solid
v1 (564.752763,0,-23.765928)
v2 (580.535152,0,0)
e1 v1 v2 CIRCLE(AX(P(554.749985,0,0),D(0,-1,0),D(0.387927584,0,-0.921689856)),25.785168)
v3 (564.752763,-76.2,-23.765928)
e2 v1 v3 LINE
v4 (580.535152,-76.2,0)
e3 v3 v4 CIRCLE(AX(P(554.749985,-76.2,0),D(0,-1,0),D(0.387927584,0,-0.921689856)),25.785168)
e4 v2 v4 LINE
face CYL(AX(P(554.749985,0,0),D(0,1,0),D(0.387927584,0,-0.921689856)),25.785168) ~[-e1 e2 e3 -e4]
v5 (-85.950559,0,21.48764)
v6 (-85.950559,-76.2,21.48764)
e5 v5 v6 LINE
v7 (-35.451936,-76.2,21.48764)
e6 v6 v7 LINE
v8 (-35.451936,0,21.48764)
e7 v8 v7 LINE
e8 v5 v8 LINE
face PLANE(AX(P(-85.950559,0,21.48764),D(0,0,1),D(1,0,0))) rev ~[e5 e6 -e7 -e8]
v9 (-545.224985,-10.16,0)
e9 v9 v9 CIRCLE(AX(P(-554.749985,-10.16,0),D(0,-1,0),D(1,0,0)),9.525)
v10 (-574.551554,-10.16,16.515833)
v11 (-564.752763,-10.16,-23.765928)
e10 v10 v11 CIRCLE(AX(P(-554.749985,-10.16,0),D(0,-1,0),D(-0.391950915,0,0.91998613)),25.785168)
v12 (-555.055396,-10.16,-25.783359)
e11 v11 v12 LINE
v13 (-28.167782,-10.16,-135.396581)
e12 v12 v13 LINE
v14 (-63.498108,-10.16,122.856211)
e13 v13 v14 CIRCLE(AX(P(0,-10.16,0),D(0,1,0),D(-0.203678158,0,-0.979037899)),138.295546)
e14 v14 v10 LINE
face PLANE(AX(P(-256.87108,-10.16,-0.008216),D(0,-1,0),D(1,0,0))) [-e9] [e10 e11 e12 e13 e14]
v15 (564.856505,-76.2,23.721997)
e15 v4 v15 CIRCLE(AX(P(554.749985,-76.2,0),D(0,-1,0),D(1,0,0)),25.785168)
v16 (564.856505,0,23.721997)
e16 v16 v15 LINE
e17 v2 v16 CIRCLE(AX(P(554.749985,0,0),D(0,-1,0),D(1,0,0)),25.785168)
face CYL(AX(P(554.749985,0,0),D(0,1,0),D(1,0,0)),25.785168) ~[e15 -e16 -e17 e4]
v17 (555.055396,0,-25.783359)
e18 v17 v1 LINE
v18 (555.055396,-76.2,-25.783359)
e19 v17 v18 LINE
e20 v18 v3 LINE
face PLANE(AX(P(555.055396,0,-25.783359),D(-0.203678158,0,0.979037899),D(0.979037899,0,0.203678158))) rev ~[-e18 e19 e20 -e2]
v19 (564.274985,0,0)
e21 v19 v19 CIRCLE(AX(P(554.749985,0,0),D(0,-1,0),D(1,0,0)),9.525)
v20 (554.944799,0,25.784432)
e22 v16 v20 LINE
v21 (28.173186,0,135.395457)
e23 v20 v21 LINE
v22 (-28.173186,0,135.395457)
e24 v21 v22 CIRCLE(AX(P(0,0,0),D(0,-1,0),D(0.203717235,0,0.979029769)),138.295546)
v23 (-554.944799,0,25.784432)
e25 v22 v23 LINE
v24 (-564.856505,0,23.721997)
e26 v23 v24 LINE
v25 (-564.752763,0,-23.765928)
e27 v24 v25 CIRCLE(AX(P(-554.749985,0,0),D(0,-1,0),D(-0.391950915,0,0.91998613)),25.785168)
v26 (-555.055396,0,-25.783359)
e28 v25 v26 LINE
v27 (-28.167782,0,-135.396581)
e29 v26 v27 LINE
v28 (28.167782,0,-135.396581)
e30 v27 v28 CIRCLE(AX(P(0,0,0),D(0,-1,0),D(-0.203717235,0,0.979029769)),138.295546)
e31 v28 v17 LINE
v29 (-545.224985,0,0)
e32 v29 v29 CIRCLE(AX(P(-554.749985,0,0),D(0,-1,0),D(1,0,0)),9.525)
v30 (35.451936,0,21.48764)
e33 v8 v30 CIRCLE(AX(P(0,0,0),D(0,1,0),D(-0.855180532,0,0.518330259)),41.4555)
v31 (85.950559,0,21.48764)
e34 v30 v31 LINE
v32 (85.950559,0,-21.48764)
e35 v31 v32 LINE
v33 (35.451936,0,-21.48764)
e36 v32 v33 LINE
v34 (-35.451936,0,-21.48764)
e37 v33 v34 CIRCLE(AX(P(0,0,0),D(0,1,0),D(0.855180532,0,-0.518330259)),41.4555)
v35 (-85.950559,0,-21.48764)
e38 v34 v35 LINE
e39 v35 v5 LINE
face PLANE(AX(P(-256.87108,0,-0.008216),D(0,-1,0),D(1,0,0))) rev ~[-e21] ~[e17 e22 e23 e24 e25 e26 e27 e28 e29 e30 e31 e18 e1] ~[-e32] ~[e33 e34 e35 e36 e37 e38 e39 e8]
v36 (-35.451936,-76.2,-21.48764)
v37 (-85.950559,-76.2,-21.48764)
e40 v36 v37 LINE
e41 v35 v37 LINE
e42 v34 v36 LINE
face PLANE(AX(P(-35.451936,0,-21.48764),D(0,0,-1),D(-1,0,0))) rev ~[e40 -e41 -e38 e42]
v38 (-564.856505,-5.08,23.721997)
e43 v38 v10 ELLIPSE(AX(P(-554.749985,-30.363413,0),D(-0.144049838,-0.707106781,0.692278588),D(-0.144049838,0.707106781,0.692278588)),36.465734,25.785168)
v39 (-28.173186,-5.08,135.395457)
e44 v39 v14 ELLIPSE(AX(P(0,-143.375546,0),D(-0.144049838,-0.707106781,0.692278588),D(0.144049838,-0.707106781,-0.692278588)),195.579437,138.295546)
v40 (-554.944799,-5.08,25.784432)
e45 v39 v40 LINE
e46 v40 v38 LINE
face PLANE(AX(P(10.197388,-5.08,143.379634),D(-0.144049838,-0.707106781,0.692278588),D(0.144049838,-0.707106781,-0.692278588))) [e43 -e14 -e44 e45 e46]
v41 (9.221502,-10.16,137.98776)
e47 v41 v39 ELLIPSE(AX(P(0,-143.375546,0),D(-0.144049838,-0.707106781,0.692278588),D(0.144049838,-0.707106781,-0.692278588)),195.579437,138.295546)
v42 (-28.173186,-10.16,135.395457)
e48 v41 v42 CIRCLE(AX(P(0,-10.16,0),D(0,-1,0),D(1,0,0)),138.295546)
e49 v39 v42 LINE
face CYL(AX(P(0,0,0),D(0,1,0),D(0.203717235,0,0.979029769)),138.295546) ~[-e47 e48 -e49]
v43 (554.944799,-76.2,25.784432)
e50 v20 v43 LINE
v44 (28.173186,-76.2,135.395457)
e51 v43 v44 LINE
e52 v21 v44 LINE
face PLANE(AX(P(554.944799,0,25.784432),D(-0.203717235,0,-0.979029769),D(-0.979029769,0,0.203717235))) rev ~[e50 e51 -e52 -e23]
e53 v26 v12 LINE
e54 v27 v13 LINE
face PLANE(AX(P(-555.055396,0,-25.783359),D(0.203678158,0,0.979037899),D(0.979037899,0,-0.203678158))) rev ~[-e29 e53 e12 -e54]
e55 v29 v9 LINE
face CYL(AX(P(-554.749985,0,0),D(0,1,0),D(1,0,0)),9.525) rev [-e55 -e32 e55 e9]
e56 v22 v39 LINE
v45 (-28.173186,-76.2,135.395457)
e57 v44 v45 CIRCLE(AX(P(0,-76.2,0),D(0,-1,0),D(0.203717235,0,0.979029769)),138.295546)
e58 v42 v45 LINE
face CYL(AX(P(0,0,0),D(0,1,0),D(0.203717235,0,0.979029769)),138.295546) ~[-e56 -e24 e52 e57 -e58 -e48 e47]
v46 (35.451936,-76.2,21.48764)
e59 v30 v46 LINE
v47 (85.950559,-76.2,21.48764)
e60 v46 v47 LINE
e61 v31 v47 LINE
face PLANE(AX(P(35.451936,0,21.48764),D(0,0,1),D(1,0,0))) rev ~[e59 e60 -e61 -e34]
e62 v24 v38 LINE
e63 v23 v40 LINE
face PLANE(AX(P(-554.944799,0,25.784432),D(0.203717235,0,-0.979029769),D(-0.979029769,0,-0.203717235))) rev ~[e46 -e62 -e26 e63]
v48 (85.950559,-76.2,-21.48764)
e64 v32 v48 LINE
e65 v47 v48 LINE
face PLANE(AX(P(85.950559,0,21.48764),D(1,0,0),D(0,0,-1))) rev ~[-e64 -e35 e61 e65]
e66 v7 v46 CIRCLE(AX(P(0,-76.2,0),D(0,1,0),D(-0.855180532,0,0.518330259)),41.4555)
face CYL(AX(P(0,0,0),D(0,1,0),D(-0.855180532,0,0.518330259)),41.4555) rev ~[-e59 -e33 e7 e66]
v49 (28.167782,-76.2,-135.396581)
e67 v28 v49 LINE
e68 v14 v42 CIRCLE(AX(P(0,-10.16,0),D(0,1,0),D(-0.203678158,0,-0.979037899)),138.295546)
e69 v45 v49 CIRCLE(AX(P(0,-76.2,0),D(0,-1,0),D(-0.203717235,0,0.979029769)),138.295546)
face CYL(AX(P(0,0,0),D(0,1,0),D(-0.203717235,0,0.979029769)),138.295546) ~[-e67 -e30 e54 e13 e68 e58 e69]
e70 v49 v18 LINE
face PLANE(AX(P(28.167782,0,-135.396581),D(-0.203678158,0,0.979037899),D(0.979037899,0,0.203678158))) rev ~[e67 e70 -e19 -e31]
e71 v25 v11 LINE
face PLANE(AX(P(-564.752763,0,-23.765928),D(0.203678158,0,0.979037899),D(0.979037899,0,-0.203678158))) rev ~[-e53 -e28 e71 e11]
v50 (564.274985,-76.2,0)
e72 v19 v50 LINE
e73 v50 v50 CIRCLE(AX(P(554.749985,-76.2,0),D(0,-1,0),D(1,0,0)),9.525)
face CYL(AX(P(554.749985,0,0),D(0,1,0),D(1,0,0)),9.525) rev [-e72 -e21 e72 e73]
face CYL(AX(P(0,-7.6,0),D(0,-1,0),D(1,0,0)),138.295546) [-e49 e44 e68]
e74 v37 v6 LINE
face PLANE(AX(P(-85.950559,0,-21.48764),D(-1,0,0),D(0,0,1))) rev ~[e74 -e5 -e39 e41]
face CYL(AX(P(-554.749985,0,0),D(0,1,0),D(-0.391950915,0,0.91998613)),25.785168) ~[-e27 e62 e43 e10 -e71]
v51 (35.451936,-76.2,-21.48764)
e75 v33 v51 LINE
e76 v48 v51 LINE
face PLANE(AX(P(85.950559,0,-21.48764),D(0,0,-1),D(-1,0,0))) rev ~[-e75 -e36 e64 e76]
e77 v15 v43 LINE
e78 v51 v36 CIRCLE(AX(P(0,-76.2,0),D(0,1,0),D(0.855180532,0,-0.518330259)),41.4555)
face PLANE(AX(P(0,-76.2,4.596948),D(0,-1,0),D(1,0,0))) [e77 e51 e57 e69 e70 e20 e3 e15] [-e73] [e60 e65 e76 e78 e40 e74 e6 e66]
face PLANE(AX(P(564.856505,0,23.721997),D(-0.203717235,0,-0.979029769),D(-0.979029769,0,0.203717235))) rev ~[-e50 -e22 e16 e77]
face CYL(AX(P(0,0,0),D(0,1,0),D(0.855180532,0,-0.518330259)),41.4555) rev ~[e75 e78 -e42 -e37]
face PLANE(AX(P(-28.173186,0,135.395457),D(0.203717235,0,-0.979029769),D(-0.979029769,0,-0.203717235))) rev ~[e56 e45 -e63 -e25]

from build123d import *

# Parameters (mm, degrees)
F0_R        = 9.525
F1_DEPTH    = 76.2
F2_DEPTH    = 10.16
F3_T4_DEPTH = 600.435352042
F3_S5_R     = 138.2955463349
F3_T6_DEPTH = 303


# Not quite as in the source:
# - a fillet or chamfer that OpenCascade refuses, or shapes differently, is made with other operations: its cross-section is extruded or revolved along the edge and cut away or added


with BuildPart() as f1:
    # F0 (on Front) → F1 (new body)
    with BuildSketch(Plane.XZ):
        with BuildLine():
            ThreePointArc((28.1677821814, -135.396581135), (107.2873174282, -87.2644810626), (138.2955463349, 0))
            ThreePointArc((138.2955463349, 0), (107.2890589283, 87.2623399316), (28.1731863292, 135.3954567484))
            ThreePointArc((28.1731863292, 135.3954567484), (0, 138.2955463349), (-28.1731863292, 135.3954567484))
            ThreePointArc((-28.1731863292, 135.3954567484), (-138.2955463073, -0.0027599392), (-28.1677821814, -135.396581135))
            ThreePointArc((-28.1677821814, -135.396581135), (0, -138.2955463349), (28.1677821814, -135.396581135))
        make_face()
        with BuildLine():
            ThreePointArc((-35.4519361343, 21.4876397772), (0, 41.4554995009), (35.4519361343, 21.4876397772))
            Line((35.4519361343, 21.4876397772), (85.9505591086, 21.4876397772))
            Line((85.9505591086, 21.4876397772), (85.9505591086, -21.4876397772))
            Line((85.9505591086, -21.4876397772), (35.4519361343, -21.4876397772))
            ThreePointArc((35.4519361343, -21.4876397772), (0, -41.4554995009), (-35.4519361343, -21.4876397772))
            Line((-35.4519361343, -21.4876397772), (-85.9505591086, -21.4876397772))
            Line((-85.9505591086, -21.4876397772), (-85.9505591086, 21.4876397772))
            Line((-85.9505591086, 21.4876397772), (-35.4519361343, 21.4876397772))
        make_face(mode=Mode.SUBTRACT)
        with BuildLine():
            ThreePointArc((28.1731863292, 135.3954567484), (107.2890589283, 87.2623399316), (138.2955463349, 0))
            ThreePointArc((138.2955463349, 0), (107.2873174282, -87.2644810626), (28.1677821814, -135.396581135))
            Line((28.1677821814, -135.396581135), (555.0553956372, -25.7833589585))
            ThreePointArc((555.0553956372, -25.7833589585), (528.9648763124, -0.0553010475), (554.9447987454, 25.7844317855))
            Line((554.9447987454, 25.7844317855), (28.1731863292, 135.3954567484))
        make_face()
        with BuildLine():
            Line((564.856504828, 23.7219966861), (554.9447987454, 25.7844317855))
            ThreePointArc((554.9447987454, 25.7844317855), (528.9648763124, -0.0553010475), (555.0553956372, -25.7833589585))
            Line((555.0553956372, -25.7833589585), (564.7527625578, -23.7659275222))
            ThreePointArc((564.7527625578, -23.7659275222), (576.2301870088, -14.2644938792), (580.5351524758, 0))
            ThreePointArc((580.5351524758, 0), (576.2612979363, 14.2175342345), (564.856504828, 23.7219966861))
        make_face()
        with Locations((554.7499847432, 0)):
            Circle(F0_R, mode=Mode.SUBTRACT)
    extrude(amount=F1_DEPTH)

    # F0 (on Front) → F2 (join)
    with BuildSketch(Plane.XZ):
        with BuildLine():
            ThreePointArc((-28.1677821814, -135.396581135), (-138.2955463073, -0.0027599392), (-28.1731863292, 135.3954567484))
            Line((-28.1731863292, 135.3954567484), (-554.9447987454, 25.7844317855))
            ThreePointArc((-554.9447987454, 25.7844317855), (-536.5861255267, 18.3016145015), (-528.9648170106, 0))
            ThreePointArc((-528.9648170106, 0), (-536.6254184882, -18.3405281566), (-555.0553956372, -25.7833589585))
            Line((-555.0553956372, -25.7833589585), (-28.1677821814, -135.396581135))
        make_face()
        with BuildLine():
            ThreePointArc((-528.9648170106, 0), (-536.5861255267, 18.3016145015), (-554.9447987454, 25.7844317855))
            Line((-554.9447987454, 25.7844317855), (-564.856504828, 23.7219966861))
            ThreePointArc((-564.856504828, 23.7219966861), (-580.5350909463, -0.056330225), (-564.7527625578, -23.7659275222))
            Line((-564.7527625578, -23.7659275222), (-555.0553956372, -25.7833589585))
            ThreePointArc((-555.0553956372, -25.7833589585), (-536.6254184882, -18.3405281566), (-528.9648170106, 0))
        make_face()
        with Locations((-554.7499847432, 0)):
            Circle(F0_R, mode=Mode.SUBTRACT)
    extrude(amount=F2_DEPTH)

    # F3: chamfer of 5.08 on 1 edges, made by hand


with BuildPart() as f3_tool2:
    # F3_s3 → F3_t4 (new body)
    with BuildSketch(Plane(origin=(38.3705740236, 0, 7.9841772943), x_dir=(0, 1, 0), z_dir=(-0.9790297688, 0, -0.2037172351))):
        Polygon((-5.08, -138.2955463349), (-10.16, -133.2155463349), (-10.16, -138.2955463349), align=None)
    extrude(amount=F3_T4_DEPTH)

    # F3_s5 → F3_t6 (cut, symmetric)
    with BuildSketch(Plane.XZ.offset(7.6)):
        Circle(F3_S5_R)
    extrude(amount=F3_T6_DEPTH, both=True, mode=Mode.SUBTRACT)


with BuildPart() as f1_1:
    add(f1.part)

    # F3_t1: cut F3_tool2
    add(f3_tool2.part, mode=Mode.SUBTRACT)


solid = f1_1.part
